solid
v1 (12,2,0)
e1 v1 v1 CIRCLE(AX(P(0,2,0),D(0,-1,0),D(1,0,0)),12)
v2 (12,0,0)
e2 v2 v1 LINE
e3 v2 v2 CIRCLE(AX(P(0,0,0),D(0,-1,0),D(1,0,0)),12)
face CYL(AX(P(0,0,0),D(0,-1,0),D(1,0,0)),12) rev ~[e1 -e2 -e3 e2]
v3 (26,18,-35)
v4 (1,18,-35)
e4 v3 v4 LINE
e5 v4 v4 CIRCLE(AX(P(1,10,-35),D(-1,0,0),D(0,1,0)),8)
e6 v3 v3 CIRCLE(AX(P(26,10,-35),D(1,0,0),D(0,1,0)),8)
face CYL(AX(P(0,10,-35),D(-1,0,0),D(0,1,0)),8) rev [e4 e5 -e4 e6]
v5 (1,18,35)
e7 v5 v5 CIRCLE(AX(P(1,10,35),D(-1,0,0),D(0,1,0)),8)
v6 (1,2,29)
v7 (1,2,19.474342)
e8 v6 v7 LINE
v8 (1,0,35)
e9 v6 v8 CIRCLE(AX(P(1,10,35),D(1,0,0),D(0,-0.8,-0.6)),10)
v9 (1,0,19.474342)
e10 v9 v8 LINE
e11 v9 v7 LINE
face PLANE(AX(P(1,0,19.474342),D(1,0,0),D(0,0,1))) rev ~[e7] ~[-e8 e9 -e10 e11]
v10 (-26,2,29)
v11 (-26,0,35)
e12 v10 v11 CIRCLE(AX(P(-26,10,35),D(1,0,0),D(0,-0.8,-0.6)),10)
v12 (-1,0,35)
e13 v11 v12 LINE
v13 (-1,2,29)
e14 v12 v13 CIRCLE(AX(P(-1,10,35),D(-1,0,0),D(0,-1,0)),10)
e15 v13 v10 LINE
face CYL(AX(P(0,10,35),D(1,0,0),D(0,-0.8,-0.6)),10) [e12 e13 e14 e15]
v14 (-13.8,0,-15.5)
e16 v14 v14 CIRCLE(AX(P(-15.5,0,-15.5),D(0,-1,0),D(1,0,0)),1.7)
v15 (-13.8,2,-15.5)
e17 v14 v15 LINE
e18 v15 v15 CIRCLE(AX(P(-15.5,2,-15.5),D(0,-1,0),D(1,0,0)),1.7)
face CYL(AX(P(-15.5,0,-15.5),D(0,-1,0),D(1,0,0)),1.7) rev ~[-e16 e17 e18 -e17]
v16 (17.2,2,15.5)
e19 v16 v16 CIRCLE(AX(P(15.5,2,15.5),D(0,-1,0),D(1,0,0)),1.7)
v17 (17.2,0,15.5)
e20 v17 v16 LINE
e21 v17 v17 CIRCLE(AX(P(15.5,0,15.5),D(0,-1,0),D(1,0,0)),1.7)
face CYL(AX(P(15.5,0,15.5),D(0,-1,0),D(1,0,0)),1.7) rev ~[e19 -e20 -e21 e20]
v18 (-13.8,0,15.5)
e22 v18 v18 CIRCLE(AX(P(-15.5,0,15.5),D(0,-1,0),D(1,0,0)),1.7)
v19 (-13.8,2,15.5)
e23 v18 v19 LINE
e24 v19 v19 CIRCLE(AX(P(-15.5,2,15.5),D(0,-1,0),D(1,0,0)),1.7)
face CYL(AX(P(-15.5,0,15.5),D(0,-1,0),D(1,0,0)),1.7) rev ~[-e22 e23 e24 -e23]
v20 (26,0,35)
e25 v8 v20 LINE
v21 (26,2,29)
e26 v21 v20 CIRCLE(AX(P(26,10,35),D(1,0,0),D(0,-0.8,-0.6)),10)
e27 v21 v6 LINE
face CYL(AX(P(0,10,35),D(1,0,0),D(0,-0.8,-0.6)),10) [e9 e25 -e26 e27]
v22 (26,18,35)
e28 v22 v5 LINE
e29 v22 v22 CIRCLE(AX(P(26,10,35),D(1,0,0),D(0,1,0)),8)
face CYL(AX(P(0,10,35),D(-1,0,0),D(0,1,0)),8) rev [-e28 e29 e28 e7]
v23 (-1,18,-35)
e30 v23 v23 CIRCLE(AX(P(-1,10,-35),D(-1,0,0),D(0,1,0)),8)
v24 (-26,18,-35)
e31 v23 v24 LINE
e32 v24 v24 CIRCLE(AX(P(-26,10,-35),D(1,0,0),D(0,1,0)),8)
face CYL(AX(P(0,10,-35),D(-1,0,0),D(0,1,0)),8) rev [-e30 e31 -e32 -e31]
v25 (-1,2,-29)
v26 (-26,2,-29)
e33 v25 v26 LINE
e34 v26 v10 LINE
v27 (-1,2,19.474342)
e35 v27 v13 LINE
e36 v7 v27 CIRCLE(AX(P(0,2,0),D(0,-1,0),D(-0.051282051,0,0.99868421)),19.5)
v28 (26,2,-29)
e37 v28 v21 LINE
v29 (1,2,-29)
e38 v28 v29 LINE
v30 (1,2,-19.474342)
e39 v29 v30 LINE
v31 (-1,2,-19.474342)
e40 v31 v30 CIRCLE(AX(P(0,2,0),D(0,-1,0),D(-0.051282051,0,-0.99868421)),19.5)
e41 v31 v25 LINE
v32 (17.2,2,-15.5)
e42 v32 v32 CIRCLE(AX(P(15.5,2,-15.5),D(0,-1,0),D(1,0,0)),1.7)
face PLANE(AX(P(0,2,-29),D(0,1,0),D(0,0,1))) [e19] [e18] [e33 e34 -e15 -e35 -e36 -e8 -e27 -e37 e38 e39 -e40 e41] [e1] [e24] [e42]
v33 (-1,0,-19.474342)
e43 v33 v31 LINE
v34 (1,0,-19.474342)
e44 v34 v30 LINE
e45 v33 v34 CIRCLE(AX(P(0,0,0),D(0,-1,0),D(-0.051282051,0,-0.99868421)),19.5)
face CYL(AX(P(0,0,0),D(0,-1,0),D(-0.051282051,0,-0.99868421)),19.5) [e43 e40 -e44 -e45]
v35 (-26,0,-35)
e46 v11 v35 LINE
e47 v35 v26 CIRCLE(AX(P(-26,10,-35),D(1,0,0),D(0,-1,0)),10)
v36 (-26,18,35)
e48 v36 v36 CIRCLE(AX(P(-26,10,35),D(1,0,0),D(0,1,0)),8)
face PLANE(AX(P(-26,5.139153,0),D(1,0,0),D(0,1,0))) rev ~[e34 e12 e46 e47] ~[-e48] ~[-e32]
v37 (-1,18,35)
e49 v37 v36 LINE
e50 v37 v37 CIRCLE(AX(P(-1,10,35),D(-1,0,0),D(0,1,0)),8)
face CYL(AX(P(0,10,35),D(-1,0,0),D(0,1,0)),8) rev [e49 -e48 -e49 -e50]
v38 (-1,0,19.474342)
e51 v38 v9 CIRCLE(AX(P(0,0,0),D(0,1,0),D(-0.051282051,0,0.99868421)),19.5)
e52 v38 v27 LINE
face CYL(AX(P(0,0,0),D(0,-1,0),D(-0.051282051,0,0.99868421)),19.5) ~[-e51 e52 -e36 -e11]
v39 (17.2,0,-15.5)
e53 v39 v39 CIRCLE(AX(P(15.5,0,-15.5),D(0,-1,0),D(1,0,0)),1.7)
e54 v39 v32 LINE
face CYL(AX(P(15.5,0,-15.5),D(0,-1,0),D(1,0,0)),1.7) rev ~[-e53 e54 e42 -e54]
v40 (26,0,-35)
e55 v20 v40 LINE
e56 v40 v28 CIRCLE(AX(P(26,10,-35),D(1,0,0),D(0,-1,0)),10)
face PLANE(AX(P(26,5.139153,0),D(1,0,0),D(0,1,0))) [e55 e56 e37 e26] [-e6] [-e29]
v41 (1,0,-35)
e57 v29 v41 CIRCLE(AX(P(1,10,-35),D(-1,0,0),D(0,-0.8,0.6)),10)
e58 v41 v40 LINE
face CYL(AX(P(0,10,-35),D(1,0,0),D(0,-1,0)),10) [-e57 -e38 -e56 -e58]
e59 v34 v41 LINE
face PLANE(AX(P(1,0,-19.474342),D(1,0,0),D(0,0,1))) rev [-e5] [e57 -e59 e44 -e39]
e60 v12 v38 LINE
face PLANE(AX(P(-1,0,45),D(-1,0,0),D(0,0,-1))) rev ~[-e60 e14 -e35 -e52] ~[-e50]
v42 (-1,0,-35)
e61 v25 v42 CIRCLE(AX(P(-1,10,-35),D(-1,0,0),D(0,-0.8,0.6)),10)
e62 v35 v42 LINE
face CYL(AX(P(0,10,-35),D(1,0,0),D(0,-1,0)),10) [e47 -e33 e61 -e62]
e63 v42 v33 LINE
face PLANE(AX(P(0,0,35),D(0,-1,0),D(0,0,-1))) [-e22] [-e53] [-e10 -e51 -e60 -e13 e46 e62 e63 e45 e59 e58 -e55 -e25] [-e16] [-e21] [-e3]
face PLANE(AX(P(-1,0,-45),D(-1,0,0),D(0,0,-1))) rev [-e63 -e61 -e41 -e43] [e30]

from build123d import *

# Parameters (mm, degrees)
F0_R     = 8
F1_DEPTH = 26
F2_R     = 12
F2_R_2   = 1.7
F3_DEPTH = 25
F5_DEPTH = 20.001


# Not quite as in the source:
# - a pattern or mirror of a feature is missing from the dataset's text; its kind, count and spacing are read off the source's solid


with BuildPart() as f1:
    # F0 (on Right) → F1 (new body, symmetric)
    with BuildSketch(Plane.YZ):
        with BuildLine():
            ThreePointArc((2, 29), (19.4868329805, 38.1622776602), (0, 35))
            Line((0, 35), (0, -35))
            ThreePointArc((0, -35), (19.4868329805, -38.1622776602), (2, -29))
            Line((2, -29), (2, 29))
        make_face()
        with Locations((10, -35)):
            Circle(F0_R, mode=Mode.SUBTRACT)
        with Locations((10, 35)):
            Circle(F0_R, mode=Mode.SUBTRACT)
    extrude(amount=F1_DEPTH, both=True)

    # F2 (on face) → F3 (cut)
    with BuildSketch(Plane.XZ):
        Circle(F2_R)
        with Locations((-15.5, 15.5)):
            Circle(F2_R_2)
        with Locations((15.5, 15.5)):
            Circle(F2_R_2)
        with Locations((15.5, -15.5)):
            Circle(F2_R_2)
        with Locations((-15.5, -15.5)):
            Circle(F2_R_2)
    extrude(amount=-F3_DEPTH, mode=Mode.SUBTRACT)

    # F4 (on face) → F5 (cut, through all)
    with BuildSketch(Plane.XZ):
        with BuildLine():
            Line((1, 19.4743420942), (1, 45))
            Line((1, 45), (-1, 45))
            Line((-1, 45), (-1, 19.4743420942))
            ThreePointArc((-1, 19.4743420942), (0, 19.5), (1, 19.4743420942))
        make_face()
    f5 = extrude(amount=-F5_DEPTH, mode=Mode.SUBTRACT)

    # F5_copies: F5 across plane
    add(f5.mirror(Plane(origin=(0, 0, 0), x_dir=(-1, 0, 0), z_dir=(0, 0, -1))), mode=Mode.SUBTRACT)


solid = f1.part
